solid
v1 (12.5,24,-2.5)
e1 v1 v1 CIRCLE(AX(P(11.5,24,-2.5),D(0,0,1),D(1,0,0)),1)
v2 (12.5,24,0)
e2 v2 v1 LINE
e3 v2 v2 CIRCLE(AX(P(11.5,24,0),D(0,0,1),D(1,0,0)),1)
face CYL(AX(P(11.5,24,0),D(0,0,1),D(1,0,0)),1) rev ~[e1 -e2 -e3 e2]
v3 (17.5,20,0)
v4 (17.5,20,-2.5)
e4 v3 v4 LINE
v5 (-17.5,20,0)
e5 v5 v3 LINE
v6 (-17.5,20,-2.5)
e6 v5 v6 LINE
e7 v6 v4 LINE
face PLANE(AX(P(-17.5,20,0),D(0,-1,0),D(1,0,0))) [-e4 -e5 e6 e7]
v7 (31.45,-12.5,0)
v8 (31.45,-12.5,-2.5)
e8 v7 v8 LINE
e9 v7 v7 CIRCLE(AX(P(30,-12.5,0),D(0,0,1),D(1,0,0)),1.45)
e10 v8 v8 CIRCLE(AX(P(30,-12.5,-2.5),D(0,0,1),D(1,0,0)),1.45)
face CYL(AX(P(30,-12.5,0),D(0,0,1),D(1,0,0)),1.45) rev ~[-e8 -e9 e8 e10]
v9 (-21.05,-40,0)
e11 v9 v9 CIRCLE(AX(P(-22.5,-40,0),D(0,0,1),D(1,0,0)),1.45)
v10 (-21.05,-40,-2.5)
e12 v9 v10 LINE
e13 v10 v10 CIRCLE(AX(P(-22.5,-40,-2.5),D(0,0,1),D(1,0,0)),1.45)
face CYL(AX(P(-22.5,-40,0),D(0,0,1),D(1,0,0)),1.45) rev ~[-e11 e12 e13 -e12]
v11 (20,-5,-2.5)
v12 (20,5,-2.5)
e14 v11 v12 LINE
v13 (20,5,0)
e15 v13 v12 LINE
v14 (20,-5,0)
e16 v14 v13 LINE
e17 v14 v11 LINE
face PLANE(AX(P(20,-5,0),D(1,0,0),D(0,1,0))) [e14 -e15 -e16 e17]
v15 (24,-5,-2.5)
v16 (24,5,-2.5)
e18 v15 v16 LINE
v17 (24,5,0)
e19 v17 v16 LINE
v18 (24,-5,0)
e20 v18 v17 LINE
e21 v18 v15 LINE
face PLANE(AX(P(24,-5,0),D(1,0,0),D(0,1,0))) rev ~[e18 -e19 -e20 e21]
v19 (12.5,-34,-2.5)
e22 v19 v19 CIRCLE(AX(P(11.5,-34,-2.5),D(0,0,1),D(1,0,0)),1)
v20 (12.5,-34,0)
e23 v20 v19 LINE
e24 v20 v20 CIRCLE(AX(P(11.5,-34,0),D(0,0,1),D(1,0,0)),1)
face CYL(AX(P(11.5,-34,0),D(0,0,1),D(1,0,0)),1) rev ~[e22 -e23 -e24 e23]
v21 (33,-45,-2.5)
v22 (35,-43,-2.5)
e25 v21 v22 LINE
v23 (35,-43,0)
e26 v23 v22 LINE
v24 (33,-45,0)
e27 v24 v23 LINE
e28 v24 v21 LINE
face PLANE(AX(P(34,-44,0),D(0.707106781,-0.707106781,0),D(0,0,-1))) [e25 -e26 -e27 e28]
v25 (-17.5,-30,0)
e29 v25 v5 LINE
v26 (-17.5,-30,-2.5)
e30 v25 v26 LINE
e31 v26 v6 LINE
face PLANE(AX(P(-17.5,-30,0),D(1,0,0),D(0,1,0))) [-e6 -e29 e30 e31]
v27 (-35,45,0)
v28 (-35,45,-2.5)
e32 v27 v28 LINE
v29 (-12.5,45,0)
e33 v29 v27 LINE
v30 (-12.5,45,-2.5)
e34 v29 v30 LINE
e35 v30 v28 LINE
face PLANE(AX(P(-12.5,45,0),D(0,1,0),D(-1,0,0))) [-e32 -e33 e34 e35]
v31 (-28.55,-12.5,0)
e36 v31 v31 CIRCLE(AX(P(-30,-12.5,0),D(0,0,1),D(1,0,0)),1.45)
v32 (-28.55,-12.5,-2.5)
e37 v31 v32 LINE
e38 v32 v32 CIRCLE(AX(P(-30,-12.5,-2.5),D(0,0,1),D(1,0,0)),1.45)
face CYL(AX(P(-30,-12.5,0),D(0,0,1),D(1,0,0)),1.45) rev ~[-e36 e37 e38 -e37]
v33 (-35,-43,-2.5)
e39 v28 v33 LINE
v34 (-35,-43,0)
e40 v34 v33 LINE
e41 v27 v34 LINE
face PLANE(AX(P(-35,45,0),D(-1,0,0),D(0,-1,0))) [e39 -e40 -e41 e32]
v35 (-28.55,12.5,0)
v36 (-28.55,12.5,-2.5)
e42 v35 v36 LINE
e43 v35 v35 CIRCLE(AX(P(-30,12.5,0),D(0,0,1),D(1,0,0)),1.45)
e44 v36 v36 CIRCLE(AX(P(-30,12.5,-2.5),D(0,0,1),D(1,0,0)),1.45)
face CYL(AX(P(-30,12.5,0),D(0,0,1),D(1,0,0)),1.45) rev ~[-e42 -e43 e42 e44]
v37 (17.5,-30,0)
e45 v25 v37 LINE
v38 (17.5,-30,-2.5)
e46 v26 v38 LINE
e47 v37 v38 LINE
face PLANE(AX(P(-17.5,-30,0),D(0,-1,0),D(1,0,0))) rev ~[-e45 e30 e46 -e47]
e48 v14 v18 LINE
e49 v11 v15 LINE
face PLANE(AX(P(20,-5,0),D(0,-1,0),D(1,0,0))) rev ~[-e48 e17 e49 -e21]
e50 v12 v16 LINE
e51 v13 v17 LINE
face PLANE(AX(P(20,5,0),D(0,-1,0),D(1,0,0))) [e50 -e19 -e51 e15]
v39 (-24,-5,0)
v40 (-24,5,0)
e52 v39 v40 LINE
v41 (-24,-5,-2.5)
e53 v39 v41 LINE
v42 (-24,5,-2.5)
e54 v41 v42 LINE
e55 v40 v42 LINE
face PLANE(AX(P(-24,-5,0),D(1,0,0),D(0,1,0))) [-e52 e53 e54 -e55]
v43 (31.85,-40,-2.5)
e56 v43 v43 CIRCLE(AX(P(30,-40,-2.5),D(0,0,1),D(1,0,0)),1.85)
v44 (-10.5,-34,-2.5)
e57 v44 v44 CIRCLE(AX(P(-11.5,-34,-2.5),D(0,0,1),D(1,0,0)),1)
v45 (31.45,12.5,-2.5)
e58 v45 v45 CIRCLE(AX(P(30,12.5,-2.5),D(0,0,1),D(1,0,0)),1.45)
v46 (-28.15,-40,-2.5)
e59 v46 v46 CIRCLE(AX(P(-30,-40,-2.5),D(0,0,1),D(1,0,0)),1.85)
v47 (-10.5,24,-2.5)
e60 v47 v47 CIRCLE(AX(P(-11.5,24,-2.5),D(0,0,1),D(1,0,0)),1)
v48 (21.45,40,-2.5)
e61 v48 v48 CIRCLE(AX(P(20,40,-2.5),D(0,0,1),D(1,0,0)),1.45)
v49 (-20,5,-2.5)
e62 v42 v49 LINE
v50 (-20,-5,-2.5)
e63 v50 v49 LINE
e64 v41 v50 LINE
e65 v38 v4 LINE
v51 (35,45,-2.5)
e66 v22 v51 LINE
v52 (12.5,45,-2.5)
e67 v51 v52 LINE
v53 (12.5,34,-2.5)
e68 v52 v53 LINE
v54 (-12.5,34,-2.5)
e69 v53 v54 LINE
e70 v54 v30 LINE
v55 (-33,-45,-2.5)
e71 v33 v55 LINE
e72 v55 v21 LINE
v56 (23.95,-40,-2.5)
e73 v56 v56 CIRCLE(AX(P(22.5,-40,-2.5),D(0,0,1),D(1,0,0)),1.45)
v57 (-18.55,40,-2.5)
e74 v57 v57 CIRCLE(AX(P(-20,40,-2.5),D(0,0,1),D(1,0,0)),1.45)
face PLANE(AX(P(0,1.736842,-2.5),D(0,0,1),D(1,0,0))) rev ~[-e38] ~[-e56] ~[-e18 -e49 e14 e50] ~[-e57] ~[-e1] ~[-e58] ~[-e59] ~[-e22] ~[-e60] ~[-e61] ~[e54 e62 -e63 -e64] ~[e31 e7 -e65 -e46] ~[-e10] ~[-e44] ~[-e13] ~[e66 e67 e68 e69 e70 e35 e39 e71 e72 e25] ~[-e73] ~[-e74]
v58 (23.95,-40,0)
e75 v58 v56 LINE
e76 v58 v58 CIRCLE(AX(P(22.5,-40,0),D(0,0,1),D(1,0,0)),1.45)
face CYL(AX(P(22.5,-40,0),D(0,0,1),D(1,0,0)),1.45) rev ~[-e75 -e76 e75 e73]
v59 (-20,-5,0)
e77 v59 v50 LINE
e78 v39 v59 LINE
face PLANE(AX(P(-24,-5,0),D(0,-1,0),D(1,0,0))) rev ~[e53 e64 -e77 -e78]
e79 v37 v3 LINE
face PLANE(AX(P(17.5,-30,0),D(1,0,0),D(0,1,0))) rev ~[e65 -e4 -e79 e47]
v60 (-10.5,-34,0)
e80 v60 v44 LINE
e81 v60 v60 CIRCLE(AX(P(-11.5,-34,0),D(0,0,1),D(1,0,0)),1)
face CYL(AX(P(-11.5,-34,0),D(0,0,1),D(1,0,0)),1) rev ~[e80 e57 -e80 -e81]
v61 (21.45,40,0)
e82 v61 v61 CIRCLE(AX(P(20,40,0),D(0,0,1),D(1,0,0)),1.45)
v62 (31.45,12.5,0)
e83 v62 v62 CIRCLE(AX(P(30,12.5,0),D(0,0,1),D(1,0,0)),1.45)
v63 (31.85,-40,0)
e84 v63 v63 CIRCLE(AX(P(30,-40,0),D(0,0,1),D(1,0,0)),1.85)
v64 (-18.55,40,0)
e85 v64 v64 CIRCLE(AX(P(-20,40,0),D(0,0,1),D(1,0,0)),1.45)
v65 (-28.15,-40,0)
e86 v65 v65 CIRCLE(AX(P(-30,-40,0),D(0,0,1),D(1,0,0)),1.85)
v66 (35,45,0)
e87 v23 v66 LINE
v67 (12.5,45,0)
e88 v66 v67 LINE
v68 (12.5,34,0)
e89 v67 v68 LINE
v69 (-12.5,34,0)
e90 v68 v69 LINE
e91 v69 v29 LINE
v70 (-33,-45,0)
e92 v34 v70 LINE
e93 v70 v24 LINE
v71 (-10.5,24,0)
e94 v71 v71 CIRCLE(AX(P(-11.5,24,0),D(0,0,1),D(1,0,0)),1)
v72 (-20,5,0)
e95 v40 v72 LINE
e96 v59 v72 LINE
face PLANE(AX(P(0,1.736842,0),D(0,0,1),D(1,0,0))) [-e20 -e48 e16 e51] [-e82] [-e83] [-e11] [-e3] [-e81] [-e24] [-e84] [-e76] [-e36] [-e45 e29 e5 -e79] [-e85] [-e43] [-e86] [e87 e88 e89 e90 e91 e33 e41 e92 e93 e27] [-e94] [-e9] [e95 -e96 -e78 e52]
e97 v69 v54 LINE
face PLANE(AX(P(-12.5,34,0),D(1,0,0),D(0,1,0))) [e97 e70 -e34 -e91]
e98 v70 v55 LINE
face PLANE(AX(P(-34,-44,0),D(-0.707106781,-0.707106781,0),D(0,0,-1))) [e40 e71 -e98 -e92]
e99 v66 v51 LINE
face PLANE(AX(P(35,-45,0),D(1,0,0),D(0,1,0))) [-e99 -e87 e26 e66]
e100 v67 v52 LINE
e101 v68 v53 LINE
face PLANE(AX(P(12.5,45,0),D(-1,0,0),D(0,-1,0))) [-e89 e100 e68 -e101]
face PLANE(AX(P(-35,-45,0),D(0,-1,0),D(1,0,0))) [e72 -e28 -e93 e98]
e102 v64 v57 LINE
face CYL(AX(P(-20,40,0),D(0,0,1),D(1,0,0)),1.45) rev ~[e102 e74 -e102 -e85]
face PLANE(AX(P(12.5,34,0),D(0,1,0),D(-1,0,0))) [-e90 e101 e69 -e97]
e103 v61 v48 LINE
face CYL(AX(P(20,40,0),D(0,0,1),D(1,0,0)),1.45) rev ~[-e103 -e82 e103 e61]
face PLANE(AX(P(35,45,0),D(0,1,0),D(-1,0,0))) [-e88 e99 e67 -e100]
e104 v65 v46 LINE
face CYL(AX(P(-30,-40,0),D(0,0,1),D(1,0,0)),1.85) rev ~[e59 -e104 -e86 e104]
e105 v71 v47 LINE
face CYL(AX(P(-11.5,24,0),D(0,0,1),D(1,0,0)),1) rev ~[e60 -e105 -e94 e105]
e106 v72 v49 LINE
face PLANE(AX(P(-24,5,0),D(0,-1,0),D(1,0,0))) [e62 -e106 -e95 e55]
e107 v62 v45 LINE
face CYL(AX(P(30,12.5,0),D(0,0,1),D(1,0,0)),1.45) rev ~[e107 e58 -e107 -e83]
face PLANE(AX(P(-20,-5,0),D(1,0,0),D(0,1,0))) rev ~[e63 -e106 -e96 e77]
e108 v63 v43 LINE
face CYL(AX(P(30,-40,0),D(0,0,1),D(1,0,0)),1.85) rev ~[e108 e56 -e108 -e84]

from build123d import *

# Parameters (mm, degrees)
F0_R     = 1.85
F0_R_2   = 1.45
F0_R_3   = 1
F0_W     = 35
F0_H     = 50
F0_W_2   = 4
F0_H_2   = 10
F1_DEPTH = 2.5
F2_SIZE  = 2


# Not quite as in the source:
# - a feature names something its author has since deleted; it is built from what else it names


with BuildPart() as f1:
    # F0 (on Top) → F1 (new body)
    with BuildSketch(Plane.XY):
        Polygon((-12.5, 45), (-35, 45), (-35, -45), (35, -45), (35, 45), (12.5, 45), (12.5, 34), (-12.5, 34), align=None)
        with Locations((-30, -40)):
            Circle(F0_R, mode=Mode.SUBTRACT)
        with Locations((-22.5, -40)):
            Circle(F0_R_2, mode=Mode.SUBTRACT)
        with Locations((-11.5, -34)):
            Circle(F0_R_3, mode=Mode.SUBTRACT)
        with Locations((-30, -12.5)):
            Circle(F0_R_2, mode=Mode.SUBTRACT)
        with Locations((11.5, -34)):
            Circle(F0_R_3, mode=Mode.SUBTRACT)
        with Locations((22.5, -40)):
            Circle(F0_R_2, mode=Mode.SUBTRACT)
        with Locations((30, -40)):
            Circle(F0_R, mode=Mode.SUBTRACT)
        with Locations((0, -5)):
            Rectangle(F0_W, F0_H, mode=Mode.SUBTRACT)
        with Locations((30, -12.5)):
            Circle(F0_R_2, mode=Mode.SUBTRACT)
        with Locations((-22, 0)):
            Rectangle(F0_W_2, F0_H_2, mode=Mode.SUBTRACT)
        with Locations((-30, 12.5)):
            Circle(F0_R_2, mode=Mode.SUBTRACT)
        with Locations((-20, 40)):
            Circle(F0_R_2, mode=Mode.SUBTRACT)
        with Locations((-11.5, 24)):
            Circle(F0_R_3, mode=Mode.SUBTRACT)
        with Locations((22, 0)):
            Rectangle(F0_W_2, F0_H_2, mode=Mode.SUBTRACT)
        with Locations((30, 12.5)):
            Circle(F0_R_2, mode=Mode.SUBTRACT)
        with Locations((11.5, 24)):
            Circle(F0_R_3, mode=Mode.SUBTRACT)
        with Locations((20, 40)):
            Circle(F0_R_2, mode=Mode.SUBTRACT)
    extrude(amount=-F1_DEPTH)

    # F2
    f2_edges = [f1.edges().sort_by_distance(p)[0] for p in [
        (-35, -45, -1.25),
        (35, -45, -1.25),
    ]]
    chamfer(f2_edges, length=F2_SIZE)


solid = f1.part
